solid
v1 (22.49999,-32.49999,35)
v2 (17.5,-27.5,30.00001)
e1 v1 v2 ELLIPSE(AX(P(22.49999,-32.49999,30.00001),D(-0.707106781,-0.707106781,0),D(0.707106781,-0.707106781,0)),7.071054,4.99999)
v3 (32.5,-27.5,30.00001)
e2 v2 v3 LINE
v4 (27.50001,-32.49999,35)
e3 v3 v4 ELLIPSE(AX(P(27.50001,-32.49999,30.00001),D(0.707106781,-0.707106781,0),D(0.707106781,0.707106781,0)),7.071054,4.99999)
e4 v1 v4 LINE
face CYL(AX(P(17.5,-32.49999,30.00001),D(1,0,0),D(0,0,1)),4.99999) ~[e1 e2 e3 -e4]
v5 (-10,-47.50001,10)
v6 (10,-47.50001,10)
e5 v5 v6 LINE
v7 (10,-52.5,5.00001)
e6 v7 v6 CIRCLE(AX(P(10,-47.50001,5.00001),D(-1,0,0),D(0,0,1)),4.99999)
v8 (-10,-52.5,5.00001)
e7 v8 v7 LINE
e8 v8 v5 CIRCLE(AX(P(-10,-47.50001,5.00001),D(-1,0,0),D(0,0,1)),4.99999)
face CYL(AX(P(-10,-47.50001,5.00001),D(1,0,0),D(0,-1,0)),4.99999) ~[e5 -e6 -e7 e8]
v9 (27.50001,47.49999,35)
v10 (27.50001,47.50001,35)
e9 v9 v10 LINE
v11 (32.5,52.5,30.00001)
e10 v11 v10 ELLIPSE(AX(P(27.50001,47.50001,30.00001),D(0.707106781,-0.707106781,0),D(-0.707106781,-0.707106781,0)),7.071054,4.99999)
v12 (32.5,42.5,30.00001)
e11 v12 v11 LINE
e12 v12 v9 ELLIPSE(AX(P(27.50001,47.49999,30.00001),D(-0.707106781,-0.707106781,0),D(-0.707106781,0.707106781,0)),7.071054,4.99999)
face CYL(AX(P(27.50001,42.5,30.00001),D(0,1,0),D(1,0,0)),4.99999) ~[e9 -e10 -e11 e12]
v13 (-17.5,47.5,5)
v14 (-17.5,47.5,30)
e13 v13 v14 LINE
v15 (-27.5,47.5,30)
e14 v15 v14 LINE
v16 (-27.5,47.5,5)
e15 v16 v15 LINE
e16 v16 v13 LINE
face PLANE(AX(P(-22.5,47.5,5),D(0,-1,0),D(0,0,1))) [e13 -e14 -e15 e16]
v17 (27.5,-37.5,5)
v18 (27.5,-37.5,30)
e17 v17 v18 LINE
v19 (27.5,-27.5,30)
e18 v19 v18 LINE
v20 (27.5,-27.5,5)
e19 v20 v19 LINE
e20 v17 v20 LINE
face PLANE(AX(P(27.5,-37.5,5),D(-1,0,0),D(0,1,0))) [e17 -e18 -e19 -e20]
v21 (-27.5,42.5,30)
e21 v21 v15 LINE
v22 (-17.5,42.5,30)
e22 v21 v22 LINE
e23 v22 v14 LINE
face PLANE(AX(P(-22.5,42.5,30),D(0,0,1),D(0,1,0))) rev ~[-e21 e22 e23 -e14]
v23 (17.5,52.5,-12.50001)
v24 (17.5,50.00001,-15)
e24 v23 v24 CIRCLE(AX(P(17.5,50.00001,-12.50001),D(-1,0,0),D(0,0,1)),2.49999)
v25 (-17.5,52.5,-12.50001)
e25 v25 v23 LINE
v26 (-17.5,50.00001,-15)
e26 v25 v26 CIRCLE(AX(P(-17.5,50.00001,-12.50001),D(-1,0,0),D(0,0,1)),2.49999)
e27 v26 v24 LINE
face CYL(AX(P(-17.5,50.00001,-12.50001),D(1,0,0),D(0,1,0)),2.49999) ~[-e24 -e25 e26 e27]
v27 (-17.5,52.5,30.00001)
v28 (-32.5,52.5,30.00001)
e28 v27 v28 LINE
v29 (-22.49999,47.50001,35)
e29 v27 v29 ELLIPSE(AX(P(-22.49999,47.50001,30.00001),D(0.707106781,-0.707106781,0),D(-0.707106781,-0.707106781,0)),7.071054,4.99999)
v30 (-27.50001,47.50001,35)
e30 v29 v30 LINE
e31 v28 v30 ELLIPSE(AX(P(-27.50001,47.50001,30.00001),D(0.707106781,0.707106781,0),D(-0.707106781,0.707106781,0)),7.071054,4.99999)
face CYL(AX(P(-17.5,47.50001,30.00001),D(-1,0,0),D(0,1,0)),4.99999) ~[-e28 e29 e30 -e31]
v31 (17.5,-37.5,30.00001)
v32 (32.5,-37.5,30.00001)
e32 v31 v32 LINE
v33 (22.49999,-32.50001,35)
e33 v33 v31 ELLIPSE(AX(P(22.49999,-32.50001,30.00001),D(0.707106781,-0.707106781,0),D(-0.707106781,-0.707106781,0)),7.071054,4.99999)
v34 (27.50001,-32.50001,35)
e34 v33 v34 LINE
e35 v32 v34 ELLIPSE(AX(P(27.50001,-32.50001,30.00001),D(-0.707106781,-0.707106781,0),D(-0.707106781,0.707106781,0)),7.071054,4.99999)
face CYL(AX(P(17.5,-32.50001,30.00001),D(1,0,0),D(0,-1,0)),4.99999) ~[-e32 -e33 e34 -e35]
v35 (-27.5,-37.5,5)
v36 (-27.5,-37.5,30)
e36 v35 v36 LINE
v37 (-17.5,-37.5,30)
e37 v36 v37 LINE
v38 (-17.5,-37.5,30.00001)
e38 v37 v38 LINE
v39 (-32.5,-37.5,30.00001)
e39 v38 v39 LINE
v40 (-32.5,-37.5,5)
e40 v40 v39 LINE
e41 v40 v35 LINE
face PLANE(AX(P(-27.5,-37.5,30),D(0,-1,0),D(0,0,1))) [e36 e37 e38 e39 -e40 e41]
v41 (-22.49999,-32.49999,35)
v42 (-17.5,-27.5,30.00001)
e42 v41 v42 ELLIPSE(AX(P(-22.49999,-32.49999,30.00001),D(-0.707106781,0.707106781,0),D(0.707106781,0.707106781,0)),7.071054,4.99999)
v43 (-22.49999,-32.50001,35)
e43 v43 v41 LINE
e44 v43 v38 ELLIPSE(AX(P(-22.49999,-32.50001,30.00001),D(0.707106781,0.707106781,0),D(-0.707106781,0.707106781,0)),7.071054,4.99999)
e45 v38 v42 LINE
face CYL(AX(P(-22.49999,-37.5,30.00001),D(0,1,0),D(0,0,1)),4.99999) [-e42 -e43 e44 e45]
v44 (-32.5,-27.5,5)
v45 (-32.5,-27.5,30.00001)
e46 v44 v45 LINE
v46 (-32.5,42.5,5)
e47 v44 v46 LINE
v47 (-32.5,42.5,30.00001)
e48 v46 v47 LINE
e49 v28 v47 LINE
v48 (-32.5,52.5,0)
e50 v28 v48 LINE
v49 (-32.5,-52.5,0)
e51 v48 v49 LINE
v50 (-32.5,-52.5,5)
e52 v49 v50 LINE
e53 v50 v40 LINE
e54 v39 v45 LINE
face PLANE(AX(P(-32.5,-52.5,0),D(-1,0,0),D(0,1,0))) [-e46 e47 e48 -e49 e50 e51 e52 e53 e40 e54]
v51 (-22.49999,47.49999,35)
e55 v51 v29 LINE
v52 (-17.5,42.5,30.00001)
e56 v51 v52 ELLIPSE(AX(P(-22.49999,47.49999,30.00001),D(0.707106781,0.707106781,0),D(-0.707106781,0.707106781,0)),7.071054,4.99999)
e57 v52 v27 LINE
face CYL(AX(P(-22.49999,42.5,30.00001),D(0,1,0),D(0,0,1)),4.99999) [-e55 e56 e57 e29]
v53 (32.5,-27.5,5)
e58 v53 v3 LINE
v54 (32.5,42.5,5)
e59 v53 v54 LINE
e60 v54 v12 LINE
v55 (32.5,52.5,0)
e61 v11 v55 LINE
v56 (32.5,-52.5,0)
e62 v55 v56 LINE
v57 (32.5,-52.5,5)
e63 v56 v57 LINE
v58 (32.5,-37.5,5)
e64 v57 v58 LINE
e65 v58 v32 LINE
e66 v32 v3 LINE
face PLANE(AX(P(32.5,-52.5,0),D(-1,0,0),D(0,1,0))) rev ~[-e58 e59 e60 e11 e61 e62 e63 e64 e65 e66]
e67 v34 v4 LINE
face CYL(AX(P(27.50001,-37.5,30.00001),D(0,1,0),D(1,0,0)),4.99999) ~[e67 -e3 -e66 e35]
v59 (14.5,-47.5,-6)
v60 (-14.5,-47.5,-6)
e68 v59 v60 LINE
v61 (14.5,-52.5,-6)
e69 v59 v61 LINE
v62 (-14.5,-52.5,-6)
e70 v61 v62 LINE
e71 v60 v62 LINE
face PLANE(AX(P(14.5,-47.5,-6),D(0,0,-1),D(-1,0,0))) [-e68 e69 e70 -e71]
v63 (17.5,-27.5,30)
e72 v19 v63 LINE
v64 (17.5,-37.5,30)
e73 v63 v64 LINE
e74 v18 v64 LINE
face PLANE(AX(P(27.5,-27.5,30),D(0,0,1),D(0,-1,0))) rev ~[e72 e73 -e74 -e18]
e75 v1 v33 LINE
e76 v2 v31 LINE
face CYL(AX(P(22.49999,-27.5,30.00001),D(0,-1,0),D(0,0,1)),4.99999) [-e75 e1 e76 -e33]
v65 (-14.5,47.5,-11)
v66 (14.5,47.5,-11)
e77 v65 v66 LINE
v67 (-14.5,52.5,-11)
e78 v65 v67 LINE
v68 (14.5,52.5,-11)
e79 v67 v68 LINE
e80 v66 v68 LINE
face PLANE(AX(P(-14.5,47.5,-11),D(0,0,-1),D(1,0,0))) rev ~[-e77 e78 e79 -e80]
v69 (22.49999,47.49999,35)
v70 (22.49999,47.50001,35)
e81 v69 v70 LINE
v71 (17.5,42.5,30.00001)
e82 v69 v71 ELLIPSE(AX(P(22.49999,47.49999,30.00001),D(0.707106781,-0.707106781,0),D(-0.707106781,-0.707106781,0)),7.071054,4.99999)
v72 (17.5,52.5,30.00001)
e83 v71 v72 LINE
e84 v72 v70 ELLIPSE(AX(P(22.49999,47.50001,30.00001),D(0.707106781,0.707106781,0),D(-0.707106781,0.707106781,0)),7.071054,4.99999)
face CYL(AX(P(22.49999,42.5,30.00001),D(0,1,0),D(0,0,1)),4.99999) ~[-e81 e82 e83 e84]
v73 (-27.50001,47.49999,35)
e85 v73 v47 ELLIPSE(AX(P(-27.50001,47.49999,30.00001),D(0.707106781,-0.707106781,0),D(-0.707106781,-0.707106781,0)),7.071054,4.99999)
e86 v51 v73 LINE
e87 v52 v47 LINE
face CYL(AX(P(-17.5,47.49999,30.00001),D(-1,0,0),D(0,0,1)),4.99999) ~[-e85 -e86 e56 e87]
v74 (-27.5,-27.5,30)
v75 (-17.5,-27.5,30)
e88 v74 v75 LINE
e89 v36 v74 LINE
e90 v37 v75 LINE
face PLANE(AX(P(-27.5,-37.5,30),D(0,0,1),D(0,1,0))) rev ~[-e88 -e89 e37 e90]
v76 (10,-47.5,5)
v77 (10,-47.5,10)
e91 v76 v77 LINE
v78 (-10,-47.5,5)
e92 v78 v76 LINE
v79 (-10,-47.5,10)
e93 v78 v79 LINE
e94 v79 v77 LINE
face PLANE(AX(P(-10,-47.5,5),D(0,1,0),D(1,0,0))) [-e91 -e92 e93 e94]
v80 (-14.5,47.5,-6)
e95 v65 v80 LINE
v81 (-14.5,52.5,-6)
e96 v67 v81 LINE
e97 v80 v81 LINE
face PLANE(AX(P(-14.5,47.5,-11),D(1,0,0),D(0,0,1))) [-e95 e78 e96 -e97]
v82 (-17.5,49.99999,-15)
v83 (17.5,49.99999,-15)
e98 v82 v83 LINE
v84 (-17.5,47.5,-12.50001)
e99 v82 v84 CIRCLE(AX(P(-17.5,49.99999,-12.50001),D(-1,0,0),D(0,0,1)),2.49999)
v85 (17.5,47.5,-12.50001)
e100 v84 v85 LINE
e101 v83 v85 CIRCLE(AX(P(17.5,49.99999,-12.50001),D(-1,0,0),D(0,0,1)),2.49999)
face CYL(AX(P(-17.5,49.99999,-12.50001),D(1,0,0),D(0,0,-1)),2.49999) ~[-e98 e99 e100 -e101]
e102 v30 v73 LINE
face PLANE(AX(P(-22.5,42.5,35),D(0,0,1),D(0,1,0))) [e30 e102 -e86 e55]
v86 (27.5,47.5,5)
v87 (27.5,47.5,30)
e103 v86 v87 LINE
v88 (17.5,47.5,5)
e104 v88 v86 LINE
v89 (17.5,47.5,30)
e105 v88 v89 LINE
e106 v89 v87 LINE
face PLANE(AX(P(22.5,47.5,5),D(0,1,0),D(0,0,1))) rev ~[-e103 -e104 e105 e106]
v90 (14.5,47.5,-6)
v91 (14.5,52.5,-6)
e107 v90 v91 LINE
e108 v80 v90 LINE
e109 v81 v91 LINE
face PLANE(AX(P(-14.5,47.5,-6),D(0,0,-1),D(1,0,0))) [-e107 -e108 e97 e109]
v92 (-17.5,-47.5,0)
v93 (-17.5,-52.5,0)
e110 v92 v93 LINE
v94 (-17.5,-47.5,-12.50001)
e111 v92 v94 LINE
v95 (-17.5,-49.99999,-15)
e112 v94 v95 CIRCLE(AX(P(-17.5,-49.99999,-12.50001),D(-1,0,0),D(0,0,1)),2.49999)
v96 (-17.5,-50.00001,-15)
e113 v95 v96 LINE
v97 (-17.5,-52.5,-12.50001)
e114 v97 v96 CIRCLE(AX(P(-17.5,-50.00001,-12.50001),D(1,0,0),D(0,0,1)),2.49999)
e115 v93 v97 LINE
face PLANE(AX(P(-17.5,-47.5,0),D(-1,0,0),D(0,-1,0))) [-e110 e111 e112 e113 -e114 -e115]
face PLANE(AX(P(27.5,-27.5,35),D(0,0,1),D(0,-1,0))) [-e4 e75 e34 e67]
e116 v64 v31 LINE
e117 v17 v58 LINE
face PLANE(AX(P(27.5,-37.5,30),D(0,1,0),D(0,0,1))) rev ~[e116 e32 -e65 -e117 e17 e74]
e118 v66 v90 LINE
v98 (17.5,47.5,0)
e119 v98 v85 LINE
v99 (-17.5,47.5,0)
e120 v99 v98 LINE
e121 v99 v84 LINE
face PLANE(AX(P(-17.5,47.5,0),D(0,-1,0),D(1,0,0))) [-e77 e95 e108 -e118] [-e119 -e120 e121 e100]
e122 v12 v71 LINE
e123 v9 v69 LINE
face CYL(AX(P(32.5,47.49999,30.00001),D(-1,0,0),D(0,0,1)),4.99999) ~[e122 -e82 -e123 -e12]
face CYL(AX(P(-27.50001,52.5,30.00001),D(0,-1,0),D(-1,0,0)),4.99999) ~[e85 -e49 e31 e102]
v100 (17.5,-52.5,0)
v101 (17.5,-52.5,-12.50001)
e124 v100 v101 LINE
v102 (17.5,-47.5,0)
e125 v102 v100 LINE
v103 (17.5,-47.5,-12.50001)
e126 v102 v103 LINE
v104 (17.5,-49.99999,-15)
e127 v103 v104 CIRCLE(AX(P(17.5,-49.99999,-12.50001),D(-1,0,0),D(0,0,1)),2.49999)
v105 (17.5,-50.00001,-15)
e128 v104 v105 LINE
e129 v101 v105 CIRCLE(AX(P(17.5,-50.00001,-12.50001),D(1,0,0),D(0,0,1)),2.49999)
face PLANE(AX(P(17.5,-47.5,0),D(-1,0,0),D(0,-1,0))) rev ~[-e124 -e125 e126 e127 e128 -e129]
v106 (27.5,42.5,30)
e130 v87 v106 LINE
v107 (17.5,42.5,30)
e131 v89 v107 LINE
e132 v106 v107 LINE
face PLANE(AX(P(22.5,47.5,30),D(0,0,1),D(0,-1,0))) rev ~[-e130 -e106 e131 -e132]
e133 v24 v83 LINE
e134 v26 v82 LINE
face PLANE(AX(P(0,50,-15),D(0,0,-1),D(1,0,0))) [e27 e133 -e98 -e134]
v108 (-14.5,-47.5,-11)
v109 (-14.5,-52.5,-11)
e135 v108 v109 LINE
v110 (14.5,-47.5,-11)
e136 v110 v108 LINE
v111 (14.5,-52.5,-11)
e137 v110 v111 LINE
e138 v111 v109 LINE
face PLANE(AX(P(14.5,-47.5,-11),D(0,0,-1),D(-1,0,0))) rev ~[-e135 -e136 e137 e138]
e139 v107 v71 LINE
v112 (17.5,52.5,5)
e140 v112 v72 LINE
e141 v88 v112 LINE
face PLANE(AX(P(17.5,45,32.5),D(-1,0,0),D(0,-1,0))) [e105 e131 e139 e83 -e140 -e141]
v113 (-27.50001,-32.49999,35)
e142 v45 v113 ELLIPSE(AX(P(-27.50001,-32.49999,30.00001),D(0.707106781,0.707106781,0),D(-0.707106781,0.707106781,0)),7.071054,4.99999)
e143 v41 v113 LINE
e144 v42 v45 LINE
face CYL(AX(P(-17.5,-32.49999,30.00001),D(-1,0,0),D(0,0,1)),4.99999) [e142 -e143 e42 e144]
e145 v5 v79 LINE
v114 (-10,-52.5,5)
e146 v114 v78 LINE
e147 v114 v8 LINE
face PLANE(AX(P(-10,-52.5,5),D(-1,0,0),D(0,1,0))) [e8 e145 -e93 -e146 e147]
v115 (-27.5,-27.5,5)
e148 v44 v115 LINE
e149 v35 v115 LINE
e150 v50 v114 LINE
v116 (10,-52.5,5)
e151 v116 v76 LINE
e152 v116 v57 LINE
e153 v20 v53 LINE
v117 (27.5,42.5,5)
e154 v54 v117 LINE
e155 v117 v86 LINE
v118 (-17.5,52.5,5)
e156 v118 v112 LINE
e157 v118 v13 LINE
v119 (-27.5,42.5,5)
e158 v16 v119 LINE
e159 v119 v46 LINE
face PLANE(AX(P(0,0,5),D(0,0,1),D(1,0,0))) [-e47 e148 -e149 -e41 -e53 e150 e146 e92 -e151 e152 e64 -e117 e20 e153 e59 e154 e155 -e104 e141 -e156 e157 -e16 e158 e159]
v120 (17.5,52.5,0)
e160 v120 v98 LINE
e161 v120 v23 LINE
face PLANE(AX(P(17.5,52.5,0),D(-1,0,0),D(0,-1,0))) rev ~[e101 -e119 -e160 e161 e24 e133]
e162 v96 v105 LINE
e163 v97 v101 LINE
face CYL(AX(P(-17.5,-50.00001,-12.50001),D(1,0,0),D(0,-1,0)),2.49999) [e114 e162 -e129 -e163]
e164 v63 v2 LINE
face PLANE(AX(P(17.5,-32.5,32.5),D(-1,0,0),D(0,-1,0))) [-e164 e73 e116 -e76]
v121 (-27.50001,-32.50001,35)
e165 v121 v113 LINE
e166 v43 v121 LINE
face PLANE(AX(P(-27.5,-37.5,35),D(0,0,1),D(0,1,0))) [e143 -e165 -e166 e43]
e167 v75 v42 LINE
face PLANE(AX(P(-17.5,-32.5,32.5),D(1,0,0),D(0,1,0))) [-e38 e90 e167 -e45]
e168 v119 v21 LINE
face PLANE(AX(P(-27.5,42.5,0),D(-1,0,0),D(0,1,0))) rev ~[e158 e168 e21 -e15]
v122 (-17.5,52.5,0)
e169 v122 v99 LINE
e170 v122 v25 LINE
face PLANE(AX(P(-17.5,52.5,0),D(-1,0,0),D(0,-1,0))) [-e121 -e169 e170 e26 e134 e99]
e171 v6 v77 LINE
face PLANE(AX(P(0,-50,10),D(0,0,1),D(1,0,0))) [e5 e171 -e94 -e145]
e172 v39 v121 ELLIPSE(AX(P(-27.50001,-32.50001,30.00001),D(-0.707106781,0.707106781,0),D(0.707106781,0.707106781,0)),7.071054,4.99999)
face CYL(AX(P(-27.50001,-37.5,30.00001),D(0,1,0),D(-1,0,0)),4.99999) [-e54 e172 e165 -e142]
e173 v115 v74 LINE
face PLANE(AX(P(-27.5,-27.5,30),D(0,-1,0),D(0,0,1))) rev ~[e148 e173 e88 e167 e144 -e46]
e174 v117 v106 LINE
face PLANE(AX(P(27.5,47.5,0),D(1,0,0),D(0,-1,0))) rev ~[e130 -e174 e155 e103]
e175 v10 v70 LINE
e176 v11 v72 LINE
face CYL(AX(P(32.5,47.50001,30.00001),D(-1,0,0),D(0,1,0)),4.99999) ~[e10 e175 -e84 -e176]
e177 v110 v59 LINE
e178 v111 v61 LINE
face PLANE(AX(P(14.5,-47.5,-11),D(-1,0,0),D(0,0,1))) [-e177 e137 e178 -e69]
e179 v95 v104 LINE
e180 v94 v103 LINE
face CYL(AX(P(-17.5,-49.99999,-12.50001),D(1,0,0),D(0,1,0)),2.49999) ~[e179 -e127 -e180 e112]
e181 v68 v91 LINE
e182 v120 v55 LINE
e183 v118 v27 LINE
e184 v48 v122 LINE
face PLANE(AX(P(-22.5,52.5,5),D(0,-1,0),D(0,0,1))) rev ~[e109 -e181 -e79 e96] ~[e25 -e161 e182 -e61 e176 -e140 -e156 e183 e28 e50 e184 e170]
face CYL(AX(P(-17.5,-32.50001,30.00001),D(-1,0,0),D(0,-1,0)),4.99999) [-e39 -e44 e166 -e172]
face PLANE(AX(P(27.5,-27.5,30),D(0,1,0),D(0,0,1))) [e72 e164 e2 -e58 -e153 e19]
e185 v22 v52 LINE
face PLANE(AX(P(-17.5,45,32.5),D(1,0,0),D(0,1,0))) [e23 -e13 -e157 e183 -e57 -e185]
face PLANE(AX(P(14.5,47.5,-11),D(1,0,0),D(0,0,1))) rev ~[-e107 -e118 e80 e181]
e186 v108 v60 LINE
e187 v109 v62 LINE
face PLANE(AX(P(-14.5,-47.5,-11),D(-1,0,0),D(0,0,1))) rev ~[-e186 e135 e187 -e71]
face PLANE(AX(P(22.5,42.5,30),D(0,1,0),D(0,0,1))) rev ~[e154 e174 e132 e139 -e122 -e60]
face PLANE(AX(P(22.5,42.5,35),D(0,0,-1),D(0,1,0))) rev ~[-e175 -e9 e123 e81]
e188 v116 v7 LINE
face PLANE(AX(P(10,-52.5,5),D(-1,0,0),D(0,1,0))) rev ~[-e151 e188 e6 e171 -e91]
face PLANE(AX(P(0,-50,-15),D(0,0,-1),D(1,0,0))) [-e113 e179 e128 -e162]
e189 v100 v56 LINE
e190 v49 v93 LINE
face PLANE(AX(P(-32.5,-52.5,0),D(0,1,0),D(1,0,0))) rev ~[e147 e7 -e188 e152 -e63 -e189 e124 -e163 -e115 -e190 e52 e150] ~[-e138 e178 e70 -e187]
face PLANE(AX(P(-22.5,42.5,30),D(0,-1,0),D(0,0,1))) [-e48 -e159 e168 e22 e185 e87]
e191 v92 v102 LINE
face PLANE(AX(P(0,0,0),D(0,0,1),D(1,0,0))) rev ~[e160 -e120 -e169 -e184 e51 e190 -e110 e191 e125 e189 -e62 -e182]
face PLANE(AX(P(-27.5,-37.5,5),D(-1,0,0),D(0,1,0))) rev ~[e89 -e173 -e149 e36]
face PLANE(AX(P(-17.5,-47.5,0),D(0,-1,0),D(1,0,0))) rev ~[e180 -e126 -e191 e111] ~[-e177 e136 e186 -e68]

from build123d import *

# Parameters (mm, degrees)
F0_W      = 65
F0_H      = 105
F2_DEPTH  = 5
F3_DEPTH  = 35
F4_W      = 5
F4_H      = 5
F5_DEPTH  = 5
F6_W      = 5
F6_H      = 5
F7_DEPTH  = 5
F8_W      = 5
F8_H      = 10
F9_DEPTH  = 30
F11_W     = 10
F11_H     = 5
F12_DEPTH = 10
F10_W     = 10
F10_H     = 5
F13_DEPTH = 10
F14_DEPTH = 5
F15_DEPTH = 5
F16_W     = 20
F16_H     = 5
F17_DEPTH = 5
F18_W     = 35
F18_H     = 5
F19_DEPTH = 15
F21_W     = 29
F21_H     = 5
F22_DEPTH = 25
F20_W     = 29
F20_H     = 5
F23_DEPTH = 25
F24_R     = 2.49999
F25_R     = 4.99999


# Not quite as in the source:
# - a fillet or chamfer is up to 0.001 mm smaller than in the source, because OpenCascade refuses the exact size


with BuildPart() as f2:
    # F0 (on Top) → F2 (new body)
    with BuildSketch(Plane.XY):
        Rectangle(F0_W, F0_H)
    extrude(amount=F2_DEPTH)

    # F1 (on face) → F3 (join)
    with BuildSketch(Plane.XY):
        Polygon((-22.5, 52.5), (-27.5, 52.5), (-32.5, 52.5), (-32.5, 47.5), (-32.5, 42.5), (-27.5, 42.5), (-27.5, 47.5), (-22.5, 47.5), align=None)
        Polygon((27.5, 52.5), (22.5, 52.5), (22.5, 47.5), (27.5, 47.5), (27.5, 42.5), (32.5, 42.5), (32.5, 52.5), align=None)
    extrude(amount=F3_DEPTH)

    # F4 (on face) → F5 (join)
    with BuildSketch(Plane(origin=(27.5, 0, 0), x_dir=(0, -1, 0), z_dir=(-1, 0, 0))):
        with Locations((-45, 32.5)):
            Rectangle(F4_W, F4_H)
    extrude(amount=F5_DEPTH)

    # F6 (on face) → F7 (join)
    with BuildSketch(Plane.YZ.offset(-27.5)):
        with Locations((45, 32.5)):
            Rectangle(F6_W, F6_H)
    extrude(amount=F7_DEPTH)

    # F8 (on face) → F9 (join)
    with BuildSketch(Plane.XY.offset(5)):
        with Locations((30, -32.5)):
            Rectangle(F8_W, F8_H)
        with Locations((-30, -32.5)):
            Rectangle(F8_W, F8_H)
    extrude(amount=F9_DEPTH)

    # F11 (on face) → F12 (join)
    with BuildSketch(Plane(origin=(27.5, 0, 0), x_dir=(0, -1, 0), z_dir=(-1, 0, 0))):
        with Locations((32.5, 32.5)):
            Rectangle(F11_W, F11_H)
    extrude(amount=F12_DEPTH)

    # F10 (on face) → F13 (join)
    with BuildSketch(Plane.YZ.offset(-27.5)):
        with Locations((-32.5, 32.5)):
            Rectangle(F10_W, F10_H)
    extrude(amount=F13_DEPTH)

    # F14 (add): a face of the model
    f14_faces = [f2.faces().sort_by_distance(p)[0] for p in [
        (22.5, 49.2857142857, 21.7857142857),
    ]]
    extrude(f14_faces, amount=F14_DEPTH)

    # F15 (add): a face of the model
    f15_faces = [f2.faces().sort_by_distance(p)[0] for p in [
        (-22.5, 49.2857142857, 21.7857142857),
    ]]
    extrude(f15_faces, amount=F15_DEPTH)

    # F16 (on face) → F17 (join)
    with BuildSketch(Plane.XY.offset(5)):
        with Locations((0, -50)):
            Rectangle(F16_W, F16_H)
    extrude(amount=F17_DEPTH)

    # F18 (on face) → F19 (join)
    with BuildSketch(Plane(origin=(0, 0, 0), x_dir=(1, 0, 0), z_dir=(0, 0, -1))):
        with Locations((0, 50)):
            Rectangle(F18_W, F18_H)
        with Locations((0, -50)):
            Rectangle(F18_W, F18_H)
    extrude(amount=F19_DEPTH)

    # F21 (on face) → F22 (cut)
    with BuildSketch(Plane.XZ.offset(-47.5)):
        with Locations((0, -8.5)):
            Rectangle(F21_W, F21_H)
    extrude(amount=-F22_DEPTH, mode=Mode.SUBTRACT)

    # F20 (on face) → F23 (cut)
    with BuildSketch(Plane(origin=(0, -47.5, 0), x_dir=(-1, 0, 0), z_dir=(0, 1, 0))):
        with Locations((0, -8.5)):
            Rectangle(F20_W, F20_H)
    extrude(amount=-F23_DEPTH, mode=Mode.SUBTRACT)

    # F24 (radius 2.5 in the source; OpenCascade refuses exactly that, so slightly less here)
    f24_edges = [f2.edges().sort_by_distance(p)[0] for p in [
        (0, 52.5, -15),
        (0, 47.5, -15),
        (0, -52.5, -15),
        (0, -47.5, -15),
    ]]
    fillet(f24_edges, radius=F24_R)

    # F25 (radius 5 in the source; OpenCascade refuses exactly that, so slightly less here)
    f25_edges = [f2.edges().sort_by_distance(p)[0] for p in [
        (-32.5, -32.5, 35),
        (32.5, -32.5, 35),
        (17.5, -32.5, 35),
        (-17.5, -32.5, 35),
        (-25, 52.5, 35),
        (25, 52.5, 35),
        (32.5, 47.5, 35),
        (25, 42.5, 35),
        (17.5, 47.5, 35),
        (-25, 42.5, 35),
        (-17.5, 47.5, 35),
        (-32.5, 47.5, 35),
        (-25, -37.5, 35),
        (-25, -27.5, 35),
        (25, -37.5, 35),
        (25, -27.5, 35),
        (0, -52.5, 10),
    ]]
    fillet(f25_edges, radius=F25_R)


solid = f2.part
